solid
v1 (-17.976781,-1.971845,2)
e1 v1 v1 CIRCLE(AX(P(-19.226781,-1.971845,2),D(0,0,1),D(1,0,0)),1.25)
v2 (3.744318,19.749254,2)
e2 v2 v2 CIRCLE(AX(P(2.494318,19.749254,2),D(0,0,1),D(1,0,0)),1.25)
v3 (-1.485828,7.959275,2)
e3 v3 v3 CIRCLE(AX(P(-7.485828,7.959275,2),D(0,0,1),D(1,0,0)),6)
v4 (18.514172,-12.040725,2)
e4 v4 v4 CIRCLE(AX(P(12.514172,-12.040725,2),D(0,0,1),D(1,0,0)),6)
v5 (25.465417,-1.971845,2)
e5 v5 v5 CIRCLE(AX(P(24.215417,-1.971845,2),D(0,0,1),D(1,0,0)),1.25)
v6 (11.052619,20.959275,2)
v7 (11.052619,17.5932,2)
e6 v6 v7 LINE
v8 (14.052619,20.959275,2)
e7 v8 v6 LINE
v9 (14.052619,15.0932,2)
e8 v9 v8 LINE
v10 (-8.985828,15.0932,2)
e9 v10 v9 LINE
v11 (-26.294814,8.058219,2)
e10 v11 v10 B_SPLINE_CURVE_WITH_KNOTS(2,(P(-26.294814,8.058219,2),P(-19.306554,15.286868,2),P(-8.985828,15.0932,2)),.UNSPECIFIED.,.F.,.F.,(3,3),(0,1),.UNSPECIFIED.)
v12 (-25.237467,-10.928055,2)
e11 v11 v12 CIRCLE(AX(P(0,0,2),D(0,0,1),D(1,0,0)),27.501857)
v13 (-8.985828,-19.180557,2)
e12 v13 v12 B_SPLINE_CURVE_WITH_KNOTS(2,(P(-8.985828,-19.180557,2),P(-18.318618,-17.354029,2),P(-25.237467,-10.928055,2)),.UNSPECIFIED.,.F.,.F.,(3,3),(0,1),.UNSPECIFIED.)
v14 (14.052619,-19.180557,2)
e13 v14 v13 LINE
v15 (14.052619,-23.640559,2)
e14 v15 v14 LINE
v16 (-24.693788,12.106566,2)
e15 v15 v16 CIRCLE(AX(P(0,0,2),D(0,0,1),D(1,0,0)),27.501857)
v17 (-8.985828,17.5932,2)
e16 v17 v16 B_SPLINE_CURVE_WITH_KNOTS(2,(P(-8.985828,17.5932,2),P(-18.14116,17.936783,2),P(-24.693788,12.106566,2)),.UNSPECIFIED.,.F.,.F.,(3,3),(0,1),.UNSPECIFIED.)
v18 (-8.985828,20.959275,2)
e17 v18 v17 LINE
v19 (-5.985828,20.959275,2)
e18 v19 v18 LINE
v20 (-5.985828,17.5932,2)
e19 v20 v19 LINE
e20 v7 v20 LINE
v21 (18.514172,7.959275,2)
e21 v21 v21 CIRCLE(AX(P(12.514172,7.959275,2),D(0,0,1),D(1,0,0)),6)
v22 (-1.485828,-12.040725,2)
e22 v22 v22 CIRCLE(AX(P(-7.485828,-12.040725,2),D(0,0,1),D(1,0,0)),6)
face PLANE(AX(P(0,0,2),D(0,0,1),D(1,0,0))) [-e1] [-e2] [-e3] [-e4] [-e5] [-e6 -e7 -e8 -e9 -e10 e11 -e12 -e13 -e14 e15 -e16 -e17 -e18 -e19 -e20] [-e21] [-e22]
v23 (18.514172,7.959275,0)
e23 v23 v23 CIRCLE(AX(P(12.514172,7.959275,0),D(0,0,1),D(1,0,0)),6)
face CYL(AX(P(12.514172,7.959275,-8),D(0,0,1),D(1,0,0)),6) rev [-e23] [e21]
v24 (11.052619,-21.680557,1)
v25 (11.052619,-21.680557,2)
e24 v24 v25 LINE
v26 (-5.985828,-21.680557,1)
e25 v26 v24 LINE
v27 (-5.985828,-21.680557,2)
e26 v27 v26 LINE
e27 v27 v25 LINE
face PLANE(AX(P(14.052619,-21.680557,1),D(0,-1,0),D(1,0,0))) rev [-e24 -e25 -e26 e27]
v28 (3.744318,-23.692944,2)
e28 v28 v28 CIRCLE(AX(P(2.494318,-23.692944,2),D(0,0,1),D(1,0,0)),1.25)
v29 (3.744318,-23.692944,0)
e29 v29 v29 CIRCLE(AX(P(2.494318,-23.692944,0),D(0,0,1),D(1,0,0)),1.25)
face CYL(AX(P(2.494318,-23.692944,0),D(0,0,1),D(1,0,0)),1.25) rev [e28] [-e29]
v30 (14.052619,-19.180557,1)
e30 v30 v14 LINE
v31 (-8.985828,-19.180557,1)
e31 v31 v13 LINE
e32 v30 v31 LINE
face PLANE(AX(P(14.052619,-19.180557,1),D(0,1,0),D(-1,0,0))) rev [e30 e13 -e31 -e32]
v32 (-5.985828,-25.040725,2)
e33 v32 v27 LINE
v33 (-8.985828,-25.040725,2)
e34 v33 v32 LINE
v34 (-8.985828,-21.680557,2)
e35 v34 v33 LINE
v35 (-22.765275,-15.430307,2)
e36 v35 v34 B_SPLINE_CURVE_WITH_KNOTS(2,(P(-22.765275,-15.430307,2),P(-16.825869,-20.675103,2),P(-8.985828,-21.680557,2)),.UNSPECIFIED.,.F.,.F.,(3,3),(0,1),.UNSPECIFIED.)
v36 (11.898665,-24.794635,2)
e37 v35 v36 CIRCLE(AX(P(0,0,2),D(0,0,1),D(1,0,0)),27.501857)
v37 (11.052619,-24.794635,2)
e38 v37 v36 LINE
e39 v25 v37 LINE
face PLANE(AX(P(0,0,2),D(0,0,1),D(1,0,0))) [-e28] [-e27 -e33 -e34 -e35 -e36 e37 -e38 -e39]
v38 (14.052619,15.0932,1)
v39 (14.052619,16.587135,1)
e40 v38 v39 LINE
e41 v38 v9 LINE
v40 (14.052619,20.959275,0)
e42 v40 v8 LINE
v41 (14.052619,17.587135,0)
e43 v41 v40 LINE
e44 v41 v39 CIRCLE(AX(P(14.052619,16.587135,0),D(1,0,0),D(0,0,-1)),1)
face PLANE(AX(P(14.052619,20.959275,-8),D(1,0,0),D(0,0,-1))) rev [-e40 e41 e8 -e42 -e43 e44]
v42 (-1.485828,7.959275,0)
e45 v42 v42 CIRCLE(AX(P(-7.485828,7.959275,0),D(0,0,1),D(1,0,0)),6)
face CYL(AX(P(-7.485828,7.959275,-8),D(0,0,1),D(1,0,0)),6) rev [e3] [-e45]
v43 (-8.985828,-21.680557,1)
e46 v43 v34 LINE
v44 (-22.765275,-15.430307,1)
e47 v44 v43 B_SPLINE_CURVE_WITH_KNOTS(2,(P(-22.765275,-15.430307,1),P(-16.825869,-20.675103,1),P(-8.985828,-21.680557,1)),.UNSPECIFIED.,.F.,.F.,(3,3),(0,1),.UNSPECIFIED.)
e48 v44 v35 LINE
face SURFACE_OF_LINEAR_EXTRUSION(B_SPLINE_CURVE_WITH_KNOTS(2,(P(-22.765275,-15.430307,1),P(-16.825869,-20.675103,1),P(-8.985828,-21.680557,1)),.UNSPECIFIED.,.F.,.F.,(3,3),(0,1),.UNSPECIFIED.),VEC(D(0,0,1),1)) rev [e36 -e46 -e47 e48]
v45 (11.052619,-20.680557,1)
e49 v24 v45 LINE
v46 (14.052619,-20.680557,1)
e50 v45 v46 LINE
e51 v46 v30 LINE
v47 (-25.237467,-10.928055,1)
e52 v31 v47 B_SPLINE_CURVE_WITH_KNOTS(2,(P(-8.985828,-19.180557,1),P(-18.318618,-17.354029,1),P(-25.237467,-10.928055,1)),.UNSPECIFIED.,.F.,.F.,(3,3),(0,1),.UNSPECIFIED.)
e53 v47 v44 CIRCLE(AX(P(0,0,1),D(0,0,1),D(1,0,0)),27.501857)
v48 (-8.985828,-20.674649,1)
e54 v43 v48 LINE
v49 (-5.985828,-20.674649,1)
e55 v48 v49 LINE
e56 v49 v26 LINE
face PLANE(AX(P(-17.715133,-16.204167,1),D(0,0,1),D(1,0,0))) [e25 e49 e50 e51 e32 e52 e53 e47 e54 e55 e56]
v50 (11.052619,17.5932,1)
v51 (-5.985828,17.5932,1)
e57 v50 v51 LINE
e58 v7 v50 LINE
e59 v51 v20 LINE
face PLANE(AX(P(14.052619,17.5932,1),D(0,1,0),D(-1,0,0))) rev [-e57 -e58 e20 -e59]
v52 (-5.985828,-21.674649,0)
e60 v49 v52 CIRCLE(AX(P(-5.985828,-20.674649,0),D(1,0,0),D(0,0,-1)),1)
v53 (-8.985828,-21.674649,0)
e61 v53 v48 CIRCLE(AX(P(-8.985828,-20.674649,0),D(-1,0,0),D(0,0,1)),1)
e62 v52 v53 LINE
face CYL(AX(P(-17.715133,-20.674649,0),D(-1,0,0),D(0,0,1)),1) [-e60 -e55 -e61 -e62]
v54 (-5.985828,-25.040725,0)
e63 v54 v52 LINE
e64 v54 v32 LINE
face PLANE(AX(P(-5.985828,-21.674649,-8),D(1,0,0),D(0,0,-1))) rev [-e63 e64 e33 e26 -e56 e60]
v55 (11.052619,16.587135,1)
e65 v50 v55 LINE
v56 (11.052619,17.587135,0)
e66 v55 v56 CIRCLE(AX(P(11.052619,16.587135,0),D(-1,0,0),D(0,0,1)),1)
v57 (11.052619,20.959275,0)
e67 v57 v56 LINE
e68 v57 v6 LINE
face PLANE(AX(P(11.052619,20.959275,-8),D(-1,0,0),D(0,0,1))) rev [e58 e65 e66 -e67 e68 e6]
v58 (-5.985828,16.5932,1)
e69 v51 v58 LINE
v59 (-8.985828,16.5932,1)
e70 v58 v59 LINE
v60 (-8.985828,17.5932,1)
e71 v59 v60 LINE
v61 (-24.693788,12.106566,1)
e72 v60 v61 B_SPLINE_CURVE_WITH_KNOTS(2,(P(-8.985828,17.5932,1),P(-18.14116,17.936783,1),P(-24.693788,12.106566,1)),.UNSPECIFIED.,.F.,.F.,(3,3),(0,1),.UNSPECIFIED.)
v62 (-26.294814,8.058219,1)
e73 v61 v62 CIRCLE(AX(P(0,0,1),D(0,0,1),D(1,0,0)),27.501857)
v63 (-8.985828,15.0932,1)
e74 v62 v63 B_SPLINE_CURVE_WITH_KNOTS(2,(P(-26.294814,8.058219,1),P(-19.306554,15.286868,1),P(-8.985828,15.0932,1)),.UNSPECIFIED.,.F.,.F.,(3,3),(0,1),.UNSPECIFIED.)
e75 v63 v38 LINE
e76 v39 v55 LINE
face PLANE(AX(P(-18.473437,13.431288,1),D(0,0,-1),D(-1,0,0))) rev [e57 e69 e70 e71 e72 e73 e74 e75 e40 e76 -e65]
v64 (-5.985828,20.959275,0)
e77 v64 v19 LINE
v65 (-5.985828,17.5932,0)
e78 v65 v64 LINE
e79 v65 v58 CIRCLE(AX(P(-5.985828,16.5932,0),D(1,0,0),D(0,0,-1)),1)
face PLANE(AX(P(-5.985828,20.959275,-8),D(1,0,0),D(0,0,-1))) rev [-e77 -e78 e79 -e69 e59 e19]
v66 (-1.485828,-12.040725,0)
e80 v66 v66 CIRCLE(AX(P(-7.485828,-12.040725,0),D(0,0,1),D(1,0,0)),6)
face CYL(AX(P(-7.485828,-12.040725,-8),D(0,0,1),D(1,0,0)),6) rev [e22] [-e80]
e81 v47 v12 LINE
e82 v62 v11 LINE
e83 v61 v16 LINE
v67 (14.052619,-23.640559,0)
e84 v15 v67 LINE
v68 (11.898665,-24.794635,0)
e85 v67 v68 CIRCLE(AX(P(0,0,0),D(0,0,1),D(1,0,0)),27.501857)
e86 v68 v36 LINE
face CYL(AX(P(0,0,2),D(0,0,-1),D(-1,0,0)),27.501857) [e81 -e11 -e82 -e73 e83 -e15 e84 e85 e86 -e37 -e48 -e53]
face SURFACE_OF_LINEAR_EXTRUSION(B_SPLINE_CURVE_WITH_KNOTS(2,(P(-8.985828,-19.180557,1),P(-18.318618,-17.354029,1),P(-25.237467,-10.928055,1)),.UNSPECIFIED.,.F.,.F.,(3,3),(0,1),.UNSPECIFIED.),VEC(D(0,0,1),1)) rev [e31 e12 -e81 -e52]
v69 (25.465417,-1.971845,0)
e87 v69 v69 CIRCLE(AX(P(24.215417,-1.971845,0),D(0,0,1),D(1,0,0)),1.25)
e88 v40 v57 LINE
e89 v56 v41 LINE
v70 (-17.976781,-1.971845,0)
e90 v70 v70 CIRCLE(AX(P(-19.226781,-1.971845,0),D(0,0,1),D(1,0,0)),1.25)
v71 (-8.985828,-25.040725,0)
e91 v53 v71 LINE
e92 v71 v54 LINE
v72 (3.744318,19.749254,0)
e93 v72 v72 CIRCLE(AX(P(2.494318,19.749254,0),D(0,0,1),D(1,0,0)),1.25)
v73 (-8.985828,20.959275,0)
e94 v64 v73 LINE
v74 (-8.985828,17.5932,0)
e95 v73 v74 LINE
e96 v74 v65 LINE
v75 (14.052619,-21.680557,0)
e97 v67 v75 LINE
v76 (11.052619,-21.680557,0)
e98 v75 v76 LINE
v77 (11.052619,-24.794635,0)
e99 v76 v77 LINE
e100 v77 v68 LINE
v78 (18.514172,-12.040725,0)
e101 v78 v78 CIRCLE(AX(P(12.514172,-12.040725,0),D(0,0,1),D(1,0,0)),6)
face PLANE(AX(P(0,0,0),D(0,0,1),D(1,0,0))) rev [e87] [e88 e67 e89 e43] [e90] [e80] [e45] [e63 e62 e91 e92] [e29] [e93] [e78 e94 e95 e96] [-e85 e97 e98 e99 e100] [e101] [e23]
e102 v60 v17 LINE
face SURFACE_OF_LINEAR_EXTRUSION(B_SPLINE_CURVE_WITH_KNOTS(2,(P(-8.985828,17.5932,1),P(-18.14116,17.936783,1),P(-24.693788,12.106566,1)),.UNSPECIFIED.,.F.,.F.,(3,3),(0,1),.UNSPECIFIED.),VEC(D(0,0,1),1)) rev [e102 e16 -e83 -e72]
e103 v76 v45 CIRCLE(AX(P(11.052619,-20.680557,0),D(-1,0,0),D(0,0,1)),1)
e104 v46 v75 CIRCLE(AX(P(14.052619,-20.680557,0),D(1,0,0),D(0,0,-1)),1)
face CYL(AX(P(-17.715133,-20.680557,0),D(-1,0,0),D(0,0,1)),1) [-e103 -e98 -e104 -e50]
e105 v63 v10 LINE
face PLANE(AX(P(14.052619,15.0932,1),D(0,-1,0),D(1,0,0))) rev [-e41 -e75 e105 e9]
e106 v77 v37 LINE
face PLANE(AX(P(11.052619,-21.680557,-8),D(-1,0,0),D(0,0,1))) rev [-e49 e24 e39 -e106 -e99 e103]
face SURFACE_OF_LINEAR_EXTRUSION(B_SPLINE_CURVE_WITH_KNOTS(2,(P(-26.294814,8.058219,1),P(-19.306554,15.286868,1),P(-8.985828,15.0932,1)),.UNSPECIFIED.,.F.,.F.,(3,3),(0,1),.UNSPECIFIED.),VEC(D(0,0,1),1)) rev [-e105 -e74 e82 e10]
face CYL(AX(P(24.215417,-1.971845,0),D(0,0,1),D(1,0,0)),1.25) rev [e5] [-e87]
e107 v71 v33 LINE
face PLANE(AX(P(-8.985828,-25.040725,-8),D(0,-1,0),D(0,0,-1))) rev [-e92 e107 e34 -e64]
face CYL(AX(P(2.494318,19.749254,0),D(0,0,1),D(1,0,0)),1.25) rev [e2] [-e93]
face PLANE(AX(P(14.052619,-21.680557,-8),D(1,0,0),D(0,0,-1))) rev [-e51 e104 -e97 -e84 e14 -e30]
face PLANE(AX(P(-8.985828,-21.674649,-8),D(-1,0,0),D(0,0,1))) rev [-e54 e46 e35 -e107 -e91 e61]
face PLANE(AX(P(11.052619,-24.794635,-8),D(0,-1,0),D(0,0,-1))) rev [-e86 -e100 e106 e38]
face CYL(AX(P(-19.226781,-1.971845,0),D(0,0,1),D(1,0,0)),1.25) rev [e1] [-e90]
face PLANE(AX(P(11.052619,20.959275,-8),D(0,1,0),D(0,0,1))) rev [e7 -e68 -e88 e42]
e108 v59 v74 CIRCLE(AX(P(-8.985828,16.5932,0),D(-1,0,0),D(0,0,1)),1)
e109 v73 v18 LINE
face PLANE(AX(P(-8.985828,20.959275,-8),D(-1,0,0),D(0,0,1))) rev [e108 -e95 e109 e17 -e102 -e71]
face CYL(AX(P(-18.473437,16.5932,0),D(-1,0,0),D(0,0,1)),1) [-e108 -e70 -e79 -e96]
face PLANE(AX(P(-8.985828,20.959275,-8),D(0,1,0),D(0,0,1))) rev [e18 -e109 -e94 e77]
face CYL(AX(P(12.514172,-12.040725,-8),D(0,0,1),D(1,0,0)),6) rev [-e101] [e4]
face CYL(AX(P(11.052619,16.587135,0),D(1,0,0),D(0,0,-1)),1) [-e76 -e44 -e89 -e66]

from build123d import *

# Parameters (mm, degrees)
SKETCH_2_R          = 27.501856853
EXTRUDE_1_DEPTH     = 2
SKETCH_3_R          = 1.25
CUT_EXTRUDE_1_DEPTH = 2
SKETCH_4_R          = 6
CUT_EXTRUDE_2_DEPTH = 10
SKETCH_5_W          = 3
SKETCH_5_H          = 3.366075566
SKETCH_5_H_2        = 3.372140362
SKETCH_5_H_3        = 3.114077882
CUT_EXTRUDE_3_DEPTH = 10
CUT_EXTRUDE_START   = -1
CUT_EXTRUDE_4_DEPTH = 1
FILLET_1_R          = 1


with BuildPart() as part:
    # 草图2 → 凸台-拉伸1 (new body)
    with BuildSketch(Plane.XY):
        Circle(SKETCH_2_R)
    extrude(amount=EXTRUDE_1_DEPTH)

    # 草图3 → 切除-拉伸1 (cut)
    with BuildSketch(Plane.XY.offset(2)):
        with Locations((2.49431801, 19.749253685)):
            Circle(SKETCH_3_R)
        with Locations((-19.226781008, -1.971845333)):
            Circle(SKETCH_3_R)
        with Locations((2.49431801, -23.692944351)):
            Circle(SKETCH_3_R)
        with Locations((24.215417028, -1.971845333)):
            Circle(SKETCH_3_R)
    extrude(amount=-CUT_EXTRUDE_1_DEPTH, mode=Mode.SUBTRACT)

    # 草图4 → 切除-拉伸2 (cut)
    with BuildSketch(Plane.XY.offset(2)):
        with Locations((-7.485828256, 7.959275259)):
            Circle(SKETCH_4_R)
        with Locations((12.514171744, 7.959275259)):
            Circle(SKETCH_4_R)
        with Locations((-7.485828256, -12.040724741)):
            Circle(SKETCH_4_R)
        with Locations((12.514171744, -12.040724741)):
            Circle(SKETCH_4_R)
    extrude(amount=-CUT_EXTRUDE_2_DEPTH, mode=Mode.SUBTRACT)

    # 草图5 → 切除-拉伸3 (cut)
    with BuildSketch(Plane.XY.offset(2)):
        with Locations((-7.485828256, 19.276237476)):
            Rectangle(SKETCH_5_W, SKETCH_5_H)
        with Locations((12.55261862, 19.273205078)):
            Rectangle(SKETCH_5_W, SKETCH_5_H_2)
        with Locations((-7.485828256, -23.357686958)):
            Rectangle(SKETCH_5_W, SKETCH_5_H)
        with Locations((12.55261862, -23.237595759)):
            Rectangle(SKETCH_5_W, SKETCH_5_H_3)
    extrude(amount=-CUT_EXTRUDE_3_DEPTH, mode=Mode.SUBTRACT)

    # 草图6 → 切除-拉伸4 (cut)
    with BuildSketch(Plane.XY.offset(2).offset(CUT_EXTRUDE_START)):
        with BuildLine():
            Line((14.05261862, -21.680556818), (-8.985828256, -21.680556818))
            add(Edge.make_bspline(
                [(-8.985828256, -21.680556818), (-16.825868564, -20.675103315), (-22.765275429, -15.430306704)],
                knots=[0, 0, 0, 1, 1, 1], degree=2))
            ThreePointArc((-22.765275429, -15.430306704), (-24.106708477, -13.237021446), (-25.237467212, -10.928054679))
            add(Edge.make_bspline(
                [(-8.985828256, -19.180556818), (-18.318618244, -17.354029051), (-25.237467212, -10.928054679)],
                knots=[0, 0, 0, 1, 1, 1], degree=2))
            Line((-8.985828256, -19.180556818), (14.05261862, -19.180556818))
            Line((14.05261862, -19.180556818), (14.05261862, -21.680556818))
        make_face()
        with BuildLine():
            Line((14.05261862, 17.593199693), (-8.985828256, 17.593199693))
            add(Edge.make_bspline(
                [(-8.985828256, 17.593199693), (-18.141159964, 17.936782553), (-24.69378833, 12.10656633)],
                knots=[0, 0, 0, 1, 1, 1], degree=2))
            ThreePointArc((-24.69378833, 12.10656633), (-25.574531677, 10.114121805), (-26.294813962, 8.058218729))
            add(Edge.make_bspline(
                [(-8.985828256, 15.093199693), (-19.306553581, 15.286867634), (-26.294813962, 8.058218729)],
                knots=[0, 0, 0, 1, 1, 1], degree=2))
            Line((-8.985828256, 15.093199693), (14.05261862, 15.093199693))
            Line((14.05261862, 15.093199693), (14.05261862, 17.593199693))
        make_face()
    extrude(amount=CUT_EXTRUDE_4_DEPTH, mode=Mode.SUBTRACT)

    # 圆角1
    # the kernel refuses this fillet: 1 mm, written as the material it takes off along each edge
    with BuildSketch(Plane(origin=(-8.985828256, -21.674649175, 1), x_dir=(0, 0, -1), z_dir=(1, 0, 0)), Plane(origin=(-5.985828256, 17.593199693, 1), x_dir=(0, 0, -1), z_dir=(-1, 0, 0))) as fillet_1_piece_1:
        with BuildLine():
            CenterArc((FILLET_1_R, FILLET_1_R), FILLET_1_R, 180, 90)
            Line((0, FILLET_1_R), (0, 0))
            Line((0, 0), (FILLET_1_R, 0))
        make_face()
    extrude(amount=3, mode=Mode.SUBTRACT)
    with BuildSketch(Plane(origin=(14.05261862, -21.680556818, 1), x_dir=(0, 0, -1), z_dir=(-1, 0, 0)), Plane(origin=(11.05261862, 17.587134897, 1), x_dir=(0, 0, -1), z_dir=(1, 0, 0))) as fillet_1_piece_2:
        with BuildLine():
            CenterArc((FILLET_1_R, -FILLET_1_R), FILLET_1_R, 90, 90)
            Line((0, -FILLET_1_R), (0, 0))
            Line((0, 0), (FILLET_1_R, 0))
        make_face()
    extrude(amount=3, mode=Mode.SUBTRACT)


solid = part.part
